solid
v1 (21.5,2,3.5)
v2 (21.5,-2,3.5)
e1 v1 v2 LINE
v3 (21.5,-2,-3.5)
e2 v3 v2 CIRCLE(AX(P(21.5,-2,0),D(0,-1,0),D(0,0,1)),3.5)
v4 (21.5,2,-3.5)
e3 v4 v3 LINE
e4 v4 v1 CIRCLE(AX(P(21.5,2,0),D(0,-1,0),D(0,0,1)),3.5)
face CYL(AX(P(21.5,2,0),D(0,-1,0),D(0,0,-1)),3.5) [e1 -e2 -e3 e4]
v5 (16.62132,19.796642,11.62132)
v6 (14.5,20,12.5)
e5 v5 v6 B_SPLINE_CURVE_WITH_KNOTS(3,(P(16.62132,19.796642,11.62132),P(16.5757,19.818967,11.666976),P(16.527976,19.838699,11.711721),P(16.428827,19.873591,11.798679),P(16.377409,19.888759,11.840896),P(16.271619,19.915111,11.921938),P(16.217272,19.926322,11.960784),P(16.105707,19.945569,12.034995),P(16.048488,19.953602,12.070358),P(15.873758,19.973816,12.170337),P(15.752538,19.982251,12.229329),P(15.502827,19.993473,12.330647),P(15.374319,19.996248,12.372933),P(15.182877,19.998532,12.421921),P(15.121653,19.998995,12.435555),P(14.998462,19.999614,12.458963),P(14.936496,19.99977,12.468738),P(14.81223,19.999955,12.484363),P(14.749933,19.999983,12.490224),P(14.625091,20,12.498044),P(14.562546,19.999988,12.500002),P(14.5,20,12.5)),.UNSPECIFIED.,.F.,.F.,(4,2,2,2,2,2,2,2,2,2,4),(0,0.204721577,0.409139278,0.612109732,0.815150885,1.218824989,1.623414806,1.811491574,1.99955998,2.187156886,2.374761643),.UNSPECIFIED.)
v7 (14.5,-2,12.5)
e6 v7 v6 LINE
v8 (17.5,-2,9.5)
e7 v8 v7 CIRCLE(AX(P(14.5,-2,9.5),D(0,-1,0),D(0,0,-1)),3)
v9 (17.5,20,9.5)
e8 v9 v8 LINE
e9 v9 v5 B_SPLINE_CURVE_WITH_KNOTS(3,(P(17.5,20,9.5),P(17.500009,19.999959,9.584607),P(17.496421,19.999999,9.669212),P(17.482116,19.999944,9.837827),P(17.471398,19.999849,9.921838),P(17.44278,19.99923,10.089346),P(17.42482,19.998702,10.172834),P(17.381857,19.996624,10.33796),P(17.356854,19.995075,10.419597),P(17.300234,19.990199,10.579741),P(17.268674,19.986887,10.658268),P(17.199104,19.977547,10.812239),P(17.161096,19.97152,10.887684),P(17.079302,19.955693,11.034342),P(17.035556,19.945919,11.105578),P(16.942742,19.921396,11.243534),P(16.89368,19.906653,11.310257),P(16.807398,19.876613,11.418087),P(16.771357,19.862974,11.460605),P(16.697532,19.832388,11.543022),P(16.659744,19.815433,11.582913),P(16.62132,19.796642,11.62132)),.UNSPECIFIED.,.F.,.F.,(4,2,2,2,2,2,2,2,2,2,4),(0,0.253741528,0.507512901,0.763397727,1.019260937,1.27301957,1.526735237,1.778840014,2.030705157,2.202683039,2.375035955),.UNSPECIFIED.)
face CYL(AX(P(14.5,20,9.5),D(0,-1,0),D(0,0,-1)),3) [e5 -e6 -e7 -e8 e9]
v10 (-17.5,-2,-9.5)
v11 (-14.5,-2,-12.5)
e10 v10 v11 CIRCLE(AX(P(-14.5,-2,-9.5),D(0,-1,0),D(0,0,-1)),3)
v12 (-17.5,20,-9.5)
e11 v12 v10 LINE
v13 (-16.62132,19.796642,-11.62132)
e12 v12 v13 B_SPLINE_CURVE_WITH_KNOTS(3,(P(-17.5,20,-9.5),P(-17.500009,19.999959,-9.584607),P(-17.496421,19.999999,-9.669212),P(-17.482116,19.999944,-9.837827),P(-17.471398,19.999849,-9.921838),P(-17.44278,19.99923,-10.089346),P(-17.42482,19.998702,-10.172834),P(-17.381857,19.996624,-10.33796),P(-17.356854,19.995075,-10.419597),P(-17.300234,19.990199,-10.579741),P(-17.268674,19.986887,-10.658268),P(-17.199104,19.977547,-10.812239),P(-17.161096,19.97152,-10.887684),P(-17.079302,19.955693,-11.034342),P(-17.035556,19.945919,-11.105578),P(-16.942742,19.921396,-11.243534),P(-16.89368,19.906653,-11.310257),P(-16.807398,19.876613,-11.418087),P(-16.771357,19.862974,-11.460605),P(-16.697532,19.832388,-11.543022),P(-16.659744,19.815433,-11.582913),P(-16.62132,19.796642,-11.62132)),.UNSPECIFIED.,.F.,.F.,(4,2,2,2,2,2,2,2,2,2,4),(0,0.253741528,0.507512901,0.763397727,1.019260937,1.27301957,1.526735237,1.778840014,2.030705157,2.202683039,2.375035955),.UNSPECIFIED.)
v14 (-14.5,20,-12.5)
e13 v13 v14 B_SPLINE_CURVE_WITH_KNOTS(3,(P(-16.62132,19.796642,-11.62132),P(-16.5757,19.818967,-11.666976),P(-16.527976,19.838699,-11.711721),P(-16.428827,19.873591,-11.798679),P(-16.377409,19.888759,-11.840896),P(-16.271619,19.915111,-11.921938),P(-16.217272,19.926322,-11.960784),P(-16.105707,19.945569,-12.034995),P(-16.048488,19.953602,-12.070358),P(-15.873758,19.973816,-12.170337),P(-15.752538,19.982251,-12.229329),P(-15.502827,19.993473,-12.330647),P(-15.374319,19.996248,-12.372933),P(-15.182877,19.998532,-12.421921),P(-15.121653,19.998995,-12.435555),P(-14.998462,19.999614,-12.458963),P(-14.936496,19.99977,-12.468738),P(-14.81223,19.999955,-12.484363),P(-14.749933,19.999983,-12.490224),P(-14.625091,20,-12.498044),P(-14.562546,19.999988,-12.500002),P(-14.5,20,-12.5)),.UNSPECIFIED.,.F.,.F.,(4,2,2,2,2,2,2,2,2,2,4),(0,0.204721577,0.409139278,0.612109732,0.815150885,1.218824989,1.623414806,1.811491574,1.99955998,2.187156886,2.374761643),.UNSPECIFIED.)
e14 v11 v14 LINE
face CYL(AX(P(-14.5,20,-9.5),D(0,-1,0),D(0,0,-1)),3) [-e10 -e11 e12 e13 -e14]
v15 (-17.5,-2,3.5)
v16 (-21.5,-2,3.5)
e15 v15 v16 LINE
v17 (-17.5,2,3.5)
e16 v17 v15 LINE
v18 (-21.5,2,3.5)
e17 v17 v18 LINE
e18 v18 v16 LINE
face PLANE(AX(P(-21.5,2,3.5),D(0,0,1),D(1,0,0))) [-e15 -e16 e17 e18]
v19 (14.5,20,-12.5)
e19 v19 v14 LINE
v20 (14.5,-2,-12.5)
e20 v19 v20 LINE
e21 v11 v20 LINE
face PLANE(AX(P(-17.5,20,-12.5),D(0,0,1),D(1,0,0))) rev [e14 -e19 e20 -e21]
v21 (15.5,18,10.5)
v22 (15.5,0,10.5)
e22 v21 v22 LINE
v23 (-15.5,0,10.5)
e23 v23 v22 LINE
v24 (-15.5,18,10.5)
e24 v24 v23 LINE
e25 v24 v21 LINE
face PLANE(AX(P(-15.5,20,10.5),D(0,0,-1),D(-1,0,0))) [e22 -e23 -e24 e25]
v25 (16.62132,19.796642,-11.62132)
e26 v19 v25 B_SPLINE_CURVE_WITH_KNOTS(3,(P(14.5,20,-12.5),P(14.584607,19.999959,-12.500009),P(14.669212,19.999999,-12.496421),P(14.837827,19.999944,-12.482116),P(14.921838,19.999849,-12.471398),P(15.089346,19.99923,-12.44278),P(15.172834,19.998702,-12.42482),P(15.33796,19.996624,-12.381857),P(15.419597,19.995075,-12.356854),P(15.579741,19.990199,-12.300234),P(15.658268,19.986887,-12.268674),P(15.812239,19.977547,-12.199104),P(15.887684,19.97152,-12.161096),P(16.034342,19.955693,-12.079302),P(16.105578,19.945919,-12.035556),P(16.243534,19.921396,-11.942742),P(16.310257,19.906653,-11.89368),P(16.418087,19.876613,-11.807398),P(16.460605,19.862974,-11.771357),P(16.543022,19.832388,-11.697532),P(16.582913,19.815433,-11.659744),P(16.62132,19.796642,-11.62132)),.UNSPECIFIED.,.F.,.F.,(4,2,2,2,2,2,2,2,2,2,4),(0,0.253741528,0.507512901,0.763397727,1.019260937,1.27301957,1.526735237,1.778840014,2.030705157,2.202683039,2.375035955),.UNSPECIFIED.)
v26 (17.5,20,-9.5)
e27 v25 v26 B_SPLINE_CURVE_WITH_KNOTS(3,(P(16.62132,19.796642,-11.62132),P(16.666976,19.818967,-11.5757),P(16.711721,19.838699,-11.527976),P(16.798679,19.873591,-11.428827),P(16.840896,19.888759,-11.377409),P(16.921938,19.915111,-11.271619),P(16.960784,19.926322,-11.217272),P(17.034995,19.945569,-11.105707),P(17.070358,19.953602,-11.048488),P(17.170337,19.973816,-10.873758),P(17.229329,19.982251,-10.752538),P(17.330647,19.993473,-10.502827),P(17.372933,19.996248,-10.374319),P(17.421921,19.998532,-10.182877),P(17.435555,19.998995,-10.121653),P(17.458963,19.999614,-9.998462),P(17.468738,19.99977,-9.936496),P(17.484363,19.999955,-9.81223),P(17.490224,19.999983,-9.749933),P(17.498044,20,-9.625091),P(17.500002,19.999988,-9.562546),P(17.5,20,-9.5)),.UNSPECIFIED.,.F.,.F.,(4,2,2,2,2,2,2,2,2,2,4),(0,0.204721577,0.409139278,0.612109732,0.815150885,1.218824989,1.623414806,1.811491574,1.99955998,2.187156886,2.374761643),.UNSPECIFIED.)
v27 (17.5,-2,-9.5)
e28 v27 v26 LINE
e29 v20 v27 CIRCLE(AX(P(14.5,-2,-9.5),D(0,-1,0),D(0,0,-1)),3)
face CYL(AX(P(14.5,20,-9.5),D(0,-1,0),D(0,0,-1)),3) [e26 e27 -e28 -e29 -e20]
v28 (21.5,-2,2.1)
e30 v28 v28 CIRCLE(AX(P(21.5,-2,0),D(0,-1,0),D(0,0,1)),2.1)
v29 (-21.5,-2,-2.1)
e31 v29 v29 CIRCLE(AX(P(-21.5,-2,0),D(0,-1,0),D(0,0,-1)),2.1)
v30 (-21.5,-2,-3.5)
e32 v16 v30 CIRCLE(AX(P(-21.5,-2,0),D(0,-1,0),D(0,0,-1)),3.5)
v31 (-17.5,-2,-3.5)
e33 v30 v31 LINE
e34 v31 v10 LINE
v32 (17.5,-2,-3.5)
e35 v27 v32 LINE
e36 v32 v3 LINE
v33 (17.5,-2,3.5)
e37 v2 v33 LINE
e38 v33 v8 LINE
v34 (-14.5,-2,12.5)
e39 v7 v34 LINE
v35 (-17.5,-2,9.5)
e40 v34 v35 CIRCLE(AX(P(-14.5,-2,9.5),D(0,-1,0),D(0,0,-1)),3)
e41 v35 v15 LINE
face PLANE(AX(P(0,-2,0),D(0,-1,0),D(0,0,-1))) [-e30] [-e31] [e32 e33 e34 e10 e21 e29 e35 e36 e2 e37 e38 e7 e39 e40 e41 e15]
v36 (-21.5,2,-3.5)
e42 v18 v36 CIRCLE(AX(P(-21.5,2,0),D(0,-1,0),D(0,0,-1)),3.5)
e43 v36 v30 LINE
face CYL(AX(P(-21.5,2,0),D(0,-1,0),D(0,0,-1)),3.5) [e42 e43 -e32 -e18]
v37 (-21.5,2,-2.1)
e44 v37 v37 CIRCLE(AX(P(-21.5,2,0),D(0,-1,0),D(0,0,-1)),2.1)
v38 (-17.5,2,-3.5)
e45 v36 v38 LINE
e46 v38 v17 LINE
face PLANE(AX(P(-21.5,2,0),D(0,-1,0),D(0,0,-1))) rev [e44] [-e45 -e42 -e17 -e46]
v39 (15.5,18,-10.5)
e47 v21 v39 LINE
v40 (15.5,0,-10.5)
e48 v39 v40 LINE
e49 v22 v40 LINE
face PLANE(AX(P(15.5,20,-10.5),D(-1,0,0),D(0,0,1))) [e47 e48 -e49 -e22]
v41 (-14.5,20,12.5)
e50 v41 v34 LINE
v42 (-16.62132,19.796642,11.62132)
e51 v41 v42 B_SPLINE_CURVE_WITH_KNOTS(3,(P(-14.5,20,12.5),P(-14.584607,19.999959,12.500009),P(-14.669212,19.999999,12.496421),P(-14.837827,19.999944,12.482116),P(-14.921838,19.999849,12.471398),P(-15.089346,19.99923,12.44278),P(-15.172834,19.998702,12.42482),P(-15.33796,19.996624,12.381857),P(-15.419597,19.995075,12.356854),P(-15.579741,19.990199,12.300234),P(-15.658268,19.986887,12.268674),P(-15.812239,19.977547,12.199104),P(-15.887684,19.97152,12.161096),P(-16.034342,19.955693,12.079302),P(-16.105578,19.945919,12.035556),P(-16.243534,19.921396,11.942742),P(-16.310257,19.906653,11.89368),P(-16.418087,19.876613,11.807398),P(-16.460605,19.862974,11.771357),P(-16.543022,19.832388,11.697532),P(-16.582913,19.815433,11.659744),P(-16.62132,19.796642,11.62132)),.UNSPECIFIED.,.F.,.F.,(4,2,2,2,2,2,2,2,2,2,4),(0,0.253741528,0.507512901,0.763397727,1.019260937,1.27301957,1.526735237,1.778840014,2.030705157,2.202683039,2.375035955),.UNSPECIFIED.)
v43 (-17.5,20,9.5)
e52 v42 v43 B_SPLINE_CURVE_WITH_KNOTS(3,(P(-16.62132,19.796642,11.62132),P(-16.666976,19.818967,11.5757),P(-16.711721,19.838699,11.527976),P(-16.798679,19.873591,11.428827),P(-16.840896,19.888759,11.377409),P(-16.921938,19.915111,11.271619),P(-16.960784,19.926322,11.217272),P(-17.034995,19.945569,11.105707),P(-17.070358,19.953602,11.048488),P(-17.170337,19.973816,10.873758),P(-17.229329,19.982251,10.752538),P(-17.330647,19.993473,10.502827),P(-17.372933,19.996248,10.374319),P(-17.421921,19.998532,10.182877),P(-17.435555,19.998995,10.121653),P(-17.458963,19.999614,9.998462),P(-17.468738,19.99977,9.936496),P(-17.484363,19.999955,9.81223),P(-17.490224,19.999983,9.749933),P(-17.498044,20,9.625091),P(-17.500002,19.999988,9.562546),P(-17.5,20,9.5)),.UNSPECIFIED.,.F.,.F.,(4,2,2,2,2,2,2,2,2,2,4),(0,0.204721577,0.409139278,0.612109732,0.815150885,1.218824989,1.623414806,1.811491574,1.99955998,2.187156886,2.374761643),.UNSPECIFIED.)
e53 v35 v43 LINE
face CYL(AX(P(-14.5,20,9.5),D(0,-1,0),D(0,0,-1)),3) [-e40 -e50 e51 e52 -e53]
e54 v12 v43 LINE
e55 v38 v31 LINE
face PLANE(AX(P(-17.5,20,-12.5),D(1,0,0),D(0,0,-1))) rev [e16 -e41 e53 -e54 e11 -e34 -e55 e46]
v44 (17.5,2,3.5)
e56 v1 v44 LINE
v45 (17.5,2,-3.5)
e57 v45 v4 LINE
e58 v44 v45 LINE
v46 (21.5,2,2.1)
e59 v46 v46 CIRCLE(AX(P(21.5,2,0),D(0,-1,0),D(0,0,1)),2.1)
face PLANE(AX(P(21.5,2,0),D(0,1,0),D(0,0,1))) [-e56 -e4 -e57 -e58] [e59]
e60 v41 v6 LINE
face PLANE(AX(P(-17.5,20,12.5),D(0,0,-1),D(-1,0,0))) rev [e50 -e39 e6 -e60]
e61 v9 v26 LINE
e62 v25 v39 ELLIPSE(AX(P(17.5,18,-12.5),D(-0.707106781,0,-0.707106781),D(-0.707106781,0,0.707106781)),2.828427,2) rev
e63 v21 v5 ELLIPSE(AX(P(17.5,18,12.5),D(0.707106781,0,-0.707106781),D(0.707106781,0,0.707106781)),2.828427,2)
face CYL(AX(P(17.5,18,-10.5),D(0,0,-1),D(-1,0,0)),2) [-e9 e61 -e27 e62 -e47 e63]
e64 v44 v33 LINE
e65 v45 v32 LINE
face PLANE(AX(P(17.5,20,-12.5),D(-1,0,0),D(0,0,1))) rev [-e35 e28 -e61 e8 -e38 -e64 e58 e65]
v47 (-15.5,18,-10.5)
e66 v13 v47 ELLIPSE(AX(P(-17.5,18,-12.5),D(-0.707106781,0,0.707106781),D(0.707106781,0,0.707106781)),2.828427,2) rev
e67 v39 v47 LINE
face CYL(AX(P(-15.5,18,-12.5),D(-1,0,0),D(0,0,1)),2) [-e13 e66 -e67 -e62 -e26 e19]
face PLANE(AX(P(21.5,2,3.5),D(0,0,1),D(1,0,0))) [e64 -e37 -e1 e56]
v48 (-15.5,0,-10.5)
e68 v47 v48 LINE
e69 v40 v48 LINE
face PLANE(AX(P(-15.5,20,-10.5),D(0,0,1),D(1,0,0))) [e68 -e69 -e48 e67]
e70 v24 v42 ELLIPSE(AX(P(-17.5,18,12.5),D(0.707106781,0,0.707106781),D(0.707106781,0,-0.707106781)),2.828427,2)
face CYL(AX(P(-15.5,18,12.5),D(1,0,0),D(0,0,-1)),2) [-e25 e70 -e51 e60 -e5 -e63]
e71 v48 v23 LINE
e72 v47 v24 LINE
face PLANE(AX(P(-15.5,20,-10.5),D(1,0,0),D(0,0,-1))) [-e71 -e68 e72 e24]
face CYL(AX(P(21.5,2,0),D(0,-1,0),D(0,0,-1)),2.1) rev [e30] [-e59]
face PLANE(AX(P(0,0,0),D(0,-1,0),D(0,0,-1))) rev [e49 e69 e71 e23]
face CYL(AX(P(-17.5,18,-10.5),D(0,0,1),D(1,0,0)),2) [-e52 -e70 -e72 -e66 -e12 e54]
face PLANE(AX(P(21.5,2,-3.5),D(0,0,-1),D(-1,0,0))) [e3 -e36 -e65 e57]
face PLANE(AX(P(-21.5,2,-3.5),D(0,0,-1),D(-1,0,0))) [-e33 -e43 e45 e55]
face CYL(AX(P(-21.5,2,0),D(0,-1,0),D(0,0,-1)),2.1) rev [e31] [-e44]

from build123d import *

# Parameters (mm, degrees)
SKETCH2_W           = 35
SKETCH2_H           = 25
SKETCH2_W_2         = 31
SKETCH2_H_2         = 21
BOSS_EXTRUDE1_DEPTH = 20
SKETCH3_W           = 35
SKETCH3_H           = 25
BOSS_EXTRUDE2_DEPTH = 2
SKETCH4_R           = 2.1
BOSS_EXTRUDE3_DEPTH = 4
FILLET1_R           = 3
FILLET2_R           = 2


with BuildPart() as part:
    # Sketch2 → Boss-Extrude1 (new body)
    with BuildSketch(Plane(origin=(0, 0, 0), x_dir=(1, 0, 0), z_dir=(0, 1, 0))):
        Rectangle(SKETCH2_W, SKETCH2_H)
        Rectangle(SKETCH2_W_2, SKETCH2_H_2, mode=Mode.SUBTRACT)
    extrude(amount=BOSS_EXTRUDE1_DEPTH)

    # Sketch3 → Boss-Extrude2 (add)
    with BuildSketch(Plane.XZ):
        Rectangle(SKETCH3_W, SKETCH3_H)
    extrude(amount=BOSS_EXTRUDE2_DEPTH)

    # Sketch4 → Boss-Extrude3 (add)
    # profile 1 of 2: a face of its own
    with BuildSketch(Plane.XZ.offset(2)):
        with BuildLine():
            Line((-21.5, 3.5), (-17.5, 3.5))
            Line((-17.5, 3.5), (-17.5, -3.5))
            Line((-17.5, -3.5), (-21.5, -3.5))
            ThreePointArc((-21.5, -3.5), (-25, 0), (-21.5, 3.5))
        make_face()
        with Locations(Location((-21.5, 0, 0), (0, 0, 270))):
            Circle(SKETCH4_R, mode=Mode.SUBTRACT)
    # profile 2 of 2: a face of its own
    with BuildSketch(Plane.XZ.offset(2)):
        with BuildLine():
            Line((17.5, 3.5), (17.5, -3.5))
            Line((17.5, -3.5), (21.5, -3.5))
            ThreePointArc((21.5, -3.5), (25, 0), (21.5, 3.5))
            Line((21.5, 3.5), (17.5, 3.5))
        make_face()
        with Locations(Location((21.5, 0, 0), (0, 0, 90))):
            Circle(SKETCH4_R, mode=Mode.SUBTRACT)
    extrude(amount=-BOSS_EXTRUDE3_DEPTH)

    # Fillet1
    fillet1_edges = [part.edges().sort_by_distance(p)[0] for p in [
        (17.5, 9, 12.5),
        (-17.5, 9, 12.5),
        (-17.5, 9, -12.5),
        (17.5, 9, -12.5),
    ]]
    fillet(fillet1_edges, radius=FILLET1_R)

    # Fillet2
    # the kernel refuses this fillet: 2 mm, written as the material it takes off along each edge
    with BuildSketch(Plane(origin=(15.5, 20, -10.5), x_dir=(1, 0, 0), z_dir=(0, 0, 1)), Plane(origin=(-15.5, 20, 10.5), x_dir=(-1, 0, 0), z_dir=(0, 0, -1))) as fillet2_piece_1:
        with BuildLine():
            CenterArc((FILLET2_R, -FILLET2_R), FILLET2_R, 90, 90)
            Line((0, -FILLET2_R), (-FILLET2_R * 0.02, -FILLET2_R))
            Line((-FILLET2_R * 0.02, -FILLET2_R), (-FILLET2_R * 0.02, FILLET2_R * 0.02))
            Line((-FILLET2_R * 0.02, FILLET2_R * 0.02), (FILLET2_R, FILLET2_R * 0.02))
            Line((FILLET2_R, FILLET2_R * 0.02), (FILLET2_R, 0))
        make_face()
    extrude(amount=21, mode=Mode.SUBTRACT)
    with BuildSketch(Plane(origin=(-15.5, 20, -10.5), x_dir=(0, 0, -1), z_dir=(1, 0, 0)), Plane(origin=(15.5, 20, 10.5), x_dir=(0, 0, 1), z_dir=(-1, 0, 0))) as fillet2_piece_2:
        with BuildLine():
            CenterArc((FILLET2_R, -FILLET2_R), FILLET2_R, 90, 90)
            Line((0, -FILLET2_R), (-FILLET2_R * 0.02, -FILLET2_R))
            Line((-FILLET2_R * 0.02, -FILLET2_R), (-FILLET2_R * 0.02, FILLET2_R * 0.02))
            Line((-FILLET2_R * 0.02, FILLET2_R * 0.02), (FILLET2_R, FILLET2_R * 0.02))
            Line((FILLET2_R, FILLET2_R * 0.02), (FILLET2_R, 0))
        make_face()
    extrude(amount=31, mode=Mode.SUBTRACT)
    with BuildSketch(Plane(origin=(15.5, 20, -15.5), x_dir=(1, 0, 0), z_dir=(0, 0, 1))) as fillet2_piece_3a_section:
        with BuildLine():
            CenterArc((FILLET2_R, -FILLET2_R), FILLET2_R, 90, 90)
            Line((0, -FILLET2_R), (-FILLET2_R * 0.02, -FILLET2_R))
            Line((-FILLET2_R * 0.02, -FILLET2_R), (-FILLET2_R * 0.02, FILLET2_R * 0.02))
            Line((-FILLET2_R * 0.02, FILLET2_R * 0.02), (FILLET2_R, FILLET2_R * 0.02))
            Line((FILLET2_R, FILLET2_R * 0.02), (FILLET2_R, 0))
        make_face()
    fillet2_piece_3a = extrude(amount=26, mode=Mode.PRIVATE)
    fillet2_piece_3a = split(fillet2_piece_3a, bisect_by=Plane(origin=(15.952790229, 19.547209771, -10.5), z_dir=(0, 0, -1)), keep=Keep.TOP, mode=Mode.PRIVATE)
    with BuildSketch(Plane(origin=(-15.5, 20, -10.5), x_dir=(0, 0, -1), z_dir=(1, 0, 0))) as fillet2_piece_3b_section:
        with BuildLine():
            CenterArc((FILLET2_R, -FILLET2_R), FILLET2_R, 90, 90)
            Line((0, -FILLET2_R), (-FILLET2_R * 0.02, -FILLET2_R))
            Line((-FILLET2_R * 0.02, -FILLET2_R), (-FILLET2_R * 0.02, FILLET2_R * 0.02))
            Line((-FILLET2_R * 0.02, FILLET2_R * 0.02), (FILLET2_R, FILLET2_R * 0.02))
            Line((FILLET2_R, FILLET2_R * 0.02), (FILLET2_R, 0))
        make_face()
    fillet2_piece_3b = extrude(amount=36, mode=Mode.PRIVATE)
    fillet2_piece_3b = split(fillet2_piece_3b, bisect_by=Plane(origin=(15.5, 19.547209771, -10.952790229), z_dir=(1, 0, 0)), keep=Keep.TOP, mode=Mode.PRIVATE)
    fillet2_piece_3 = fillet2_piece_3a & fillet2_piece_3b
    add(fillet2_piece_3, mode=Mode.SUBTRACT)
    with BuildSketch(Plane(origin=(20.5, 20, 10.5), x_dir=(0, 0, 1), z_dir=(-1, 0, 0))) as fillet2_piece_4a_section:
        with BuildLine():
            CenterArc((FILLET2_R, -FILLET2_R), FILLET2_R, 90, 90)
            Line((0, -FILLET2_R), (-FILLET2_R * 0.02, -FILLET2_R))
            Line((-FILLET2_R * 0.02, -FILLET2_R), (-FILLET2_R * 0.02, FILLET2_R * 0.02))
            Line((-FILLET2_R * 0.02, FILLET2_R * 0.02), (FILLET2_R, FILLET2_R * 0.02))
            Line((FILLET2_R, FILLET2_R * 0.02), (FILLET2_R, 0))
        make_face()
    fillet2_piece_4a = extrude(amount=36, mode=Mode.PRIVATE)
    fillet2_piece_4a = split(fillet2_piece_4a, bisect_by=Plane(origin=(15.5, 19.547209771, 10.952790229), z_dir=(1, 0, 0)), keep=Keep.TOP, mode=Mode.PRIVATE)
    with BuildSketch(Plane(origin=(15.5, 20, -10.5), x_dir=(1, 0, 0), z_dir=(0, 0, 1))) as fillet2_piece_4b_section:
        with BuildLine():
            CenterArc((FILLET2_R, -FILLET2_R), FILLET2_R, 90, 90)
            Line((0, -FILLET2_R), (-FILLET2_R * 0.02, -FILLET2_R))
            Line((-FILLET2_R * 0.02, -FILLET2_R), (-FILLET2_R * 0.02, FILLET2_R * 0.02))
            Line((-FILLET2_R * 0.02, FILLET2_R * 0.02), (FILLET2_R, FILLET2_R * 0.02))
            Line((FILLET2_R, FILLET2_R * 0.02), (FILLET2_R, 0))
        make_face()
    fillet2_piece_4b = extrude(amount=26, mode=Mode.PRIVATE)
    fillet2_piece_4b = split(fillet2_piece_4b, bisect_by=Plane(origin=(15.952790229, 19.547209771, 10.5), z_dir=(0, 0, 1)), keep=Keep.TOP, mode=Mode.PRIVATE)
    fillet2_piece_4 = fillet2_piece_4a & fillet2_piece_4b
    add(fillet2_piece_4, mode=Mode.SUBTRACT)
    with BuildSketch(Plane(origin=(-15.5, 20, 10.5), x_dir=(-1, 0, 0), z_dir=(0, 0, -1))) as fillet2_piece_5a_section:
        with BuildLine():
            CenterArc((FILLET2_R, -FILLET2_R), FILLET2_R, 90, 90)
            Line((0, -FILLET2_R), (-FILLET2_R * 0.02, -FILLET2_R))
            Line((-FILLET2_R * 0.02, -FILLET2_R), (-FILLET2_R * 0.02, FILLET2_R * 0.02))
            Line((-FILLET2_R * 0.02, FILLET2_R * 0.02), (FILLET2_R, FILLET2_R * 0.02))
            Line((FILLET2_R, FILLET2_R * 0.02), (FILLET2_R, 0))
        make_face()
    fillet2_piece_5a = extrude(amount=26, mode=Mode.PRIVATE)
    fillet2_piece_5a = split(fillet2_piece_5a, bisect_by=Plane(origin=(-15.952790229, 19.547209771, -10.5), z_dir=(0, 0, -1)), keep=Keep.TOP, mode=Mode.PRIVATE)
    with BuildSketch(Plane(origin=(-20.5, 20, -10.5), x_dir=(0, 0, -1), z_dir=(1, 0, 0))) as fillet2_piece_5b_section:
        with BuildLine():
            CenterArc((FILLET2_R, -FILLET2_R), FILLET2_R, 90, 90)
            Line((0, -FILLET2_R), (-FILLET2_R * 0.02, -FILLET2_R))
            Line((-FILLET2_R * 0.02, -FILLET2_R), (-FILLET2_R * 0.02, FILLET2_R * 0.02))
            Line((-FILLET2_R * 0.02, FILLET2_R * 0.02), (FILLET2_R, FILLET2_R * 0.02))
            Line((FILLET2_R, FILLET2_R * 0.02), (FILLET2_R, 0))
        make_face()
    fillet2_piece_5b = extrude(amount=36, mode=Mode.PRIVATE)
    fillet2_piece_5b = split(fillet2_piece_5b, bisect_by=Plane(origin=(-15.5, 19.547209771, -10.952790229), z_dir=(-1, 0, 0)), keep=Keep.TOP, mode=Mode.PRIVATE)
    fillet2_piece_5 = fillet2_piece_5a & fillet2_piece_5b
    add(fillet2_piece_5, mode=Mode.SUBTRACT)
    with BuildSketch(Plane(origin=(-15.5, 20, 15.5), x_dir=(-1, 0, 0), z_dir=(0, 0, -1))) as fillet2_piece_6a_section:
        with BuildLine():
            CenterArc((FILLET2_R, -FILLET2_R), FILLET2_R, 90, 90)
            Line((0, -FILLET2_R), (-FILLET2_R * 0.02, -FILLET2_R))
            Line((-FILLET2_R * 0.02, -FILLET2_R), (-FILLET2_R * 0.02, FILLET2_R * 0.02))
            Line((-FILLET2_R * 0.02, FILLET2_R * 0.02), (FILLET2_R, FILLET2_R * 0.02))
            Line((FILLET2_R, FILLET2_R * 0.02), (FILLET2_R, 0))
        make_face()
    fillet2_piece_6a = extrude(amount=26, mode=Mode.PRIVATE)
    fillet2_piece_6a = split(fillet2_piece_6a, bisect_by=Plane(origin=(-15.952790229, 19.547209771, 10.5), z_dir=(0, 0, 1)), keep=Keep.TOP, mode=Mode.PRIVATE)
    with BuildSketch(Plane(origin=(15.5, 20, 10.5), x_dir=(0, 0, 1), z_dir=(-1, 0, 0))) as fillet2_piece_6b_section:
        with BuildLine():
            CenterArc((FILLET2_R, -FILLET2_R), FILLET2_R, 90, 90)
            Line((0, -FILLET2_R), (-FILLET2_R * 0.02, -FILLET2_R))
            Line((-FILLET2_R * 0.02, -FILLET2_R), (-FILLET2_R * 0.02, FILLET2_R * 0.02))
            Line((-FILLET2_R * 0.02, FILLET2_R * 0.02), (FILLET2_R, FILLET2_R * 0.02))
            Line((FILLET2_R, FILLET2_R * 0.02), (FILLET2_R, 0))
        make_face()
    fillet2_piece_6b = extrude(amount=36, mode=Mode.PRIVATE)
    fillet2_piece_6b = split(fillet2_piece_6b, bisect_by=Plane(origin=(-15.5, 19.547209771, 10.952790229), z_dir=(-1, 0, 0)), keep=Keep.TOP, mode=Mode.PRIVATE)
    fillet2_piece_6 = fillet2_piece_6a & fillet2_piece_6b
    add(fillet2_piece_6, mode=Mode.SUBTRACT)


solid = part.part
